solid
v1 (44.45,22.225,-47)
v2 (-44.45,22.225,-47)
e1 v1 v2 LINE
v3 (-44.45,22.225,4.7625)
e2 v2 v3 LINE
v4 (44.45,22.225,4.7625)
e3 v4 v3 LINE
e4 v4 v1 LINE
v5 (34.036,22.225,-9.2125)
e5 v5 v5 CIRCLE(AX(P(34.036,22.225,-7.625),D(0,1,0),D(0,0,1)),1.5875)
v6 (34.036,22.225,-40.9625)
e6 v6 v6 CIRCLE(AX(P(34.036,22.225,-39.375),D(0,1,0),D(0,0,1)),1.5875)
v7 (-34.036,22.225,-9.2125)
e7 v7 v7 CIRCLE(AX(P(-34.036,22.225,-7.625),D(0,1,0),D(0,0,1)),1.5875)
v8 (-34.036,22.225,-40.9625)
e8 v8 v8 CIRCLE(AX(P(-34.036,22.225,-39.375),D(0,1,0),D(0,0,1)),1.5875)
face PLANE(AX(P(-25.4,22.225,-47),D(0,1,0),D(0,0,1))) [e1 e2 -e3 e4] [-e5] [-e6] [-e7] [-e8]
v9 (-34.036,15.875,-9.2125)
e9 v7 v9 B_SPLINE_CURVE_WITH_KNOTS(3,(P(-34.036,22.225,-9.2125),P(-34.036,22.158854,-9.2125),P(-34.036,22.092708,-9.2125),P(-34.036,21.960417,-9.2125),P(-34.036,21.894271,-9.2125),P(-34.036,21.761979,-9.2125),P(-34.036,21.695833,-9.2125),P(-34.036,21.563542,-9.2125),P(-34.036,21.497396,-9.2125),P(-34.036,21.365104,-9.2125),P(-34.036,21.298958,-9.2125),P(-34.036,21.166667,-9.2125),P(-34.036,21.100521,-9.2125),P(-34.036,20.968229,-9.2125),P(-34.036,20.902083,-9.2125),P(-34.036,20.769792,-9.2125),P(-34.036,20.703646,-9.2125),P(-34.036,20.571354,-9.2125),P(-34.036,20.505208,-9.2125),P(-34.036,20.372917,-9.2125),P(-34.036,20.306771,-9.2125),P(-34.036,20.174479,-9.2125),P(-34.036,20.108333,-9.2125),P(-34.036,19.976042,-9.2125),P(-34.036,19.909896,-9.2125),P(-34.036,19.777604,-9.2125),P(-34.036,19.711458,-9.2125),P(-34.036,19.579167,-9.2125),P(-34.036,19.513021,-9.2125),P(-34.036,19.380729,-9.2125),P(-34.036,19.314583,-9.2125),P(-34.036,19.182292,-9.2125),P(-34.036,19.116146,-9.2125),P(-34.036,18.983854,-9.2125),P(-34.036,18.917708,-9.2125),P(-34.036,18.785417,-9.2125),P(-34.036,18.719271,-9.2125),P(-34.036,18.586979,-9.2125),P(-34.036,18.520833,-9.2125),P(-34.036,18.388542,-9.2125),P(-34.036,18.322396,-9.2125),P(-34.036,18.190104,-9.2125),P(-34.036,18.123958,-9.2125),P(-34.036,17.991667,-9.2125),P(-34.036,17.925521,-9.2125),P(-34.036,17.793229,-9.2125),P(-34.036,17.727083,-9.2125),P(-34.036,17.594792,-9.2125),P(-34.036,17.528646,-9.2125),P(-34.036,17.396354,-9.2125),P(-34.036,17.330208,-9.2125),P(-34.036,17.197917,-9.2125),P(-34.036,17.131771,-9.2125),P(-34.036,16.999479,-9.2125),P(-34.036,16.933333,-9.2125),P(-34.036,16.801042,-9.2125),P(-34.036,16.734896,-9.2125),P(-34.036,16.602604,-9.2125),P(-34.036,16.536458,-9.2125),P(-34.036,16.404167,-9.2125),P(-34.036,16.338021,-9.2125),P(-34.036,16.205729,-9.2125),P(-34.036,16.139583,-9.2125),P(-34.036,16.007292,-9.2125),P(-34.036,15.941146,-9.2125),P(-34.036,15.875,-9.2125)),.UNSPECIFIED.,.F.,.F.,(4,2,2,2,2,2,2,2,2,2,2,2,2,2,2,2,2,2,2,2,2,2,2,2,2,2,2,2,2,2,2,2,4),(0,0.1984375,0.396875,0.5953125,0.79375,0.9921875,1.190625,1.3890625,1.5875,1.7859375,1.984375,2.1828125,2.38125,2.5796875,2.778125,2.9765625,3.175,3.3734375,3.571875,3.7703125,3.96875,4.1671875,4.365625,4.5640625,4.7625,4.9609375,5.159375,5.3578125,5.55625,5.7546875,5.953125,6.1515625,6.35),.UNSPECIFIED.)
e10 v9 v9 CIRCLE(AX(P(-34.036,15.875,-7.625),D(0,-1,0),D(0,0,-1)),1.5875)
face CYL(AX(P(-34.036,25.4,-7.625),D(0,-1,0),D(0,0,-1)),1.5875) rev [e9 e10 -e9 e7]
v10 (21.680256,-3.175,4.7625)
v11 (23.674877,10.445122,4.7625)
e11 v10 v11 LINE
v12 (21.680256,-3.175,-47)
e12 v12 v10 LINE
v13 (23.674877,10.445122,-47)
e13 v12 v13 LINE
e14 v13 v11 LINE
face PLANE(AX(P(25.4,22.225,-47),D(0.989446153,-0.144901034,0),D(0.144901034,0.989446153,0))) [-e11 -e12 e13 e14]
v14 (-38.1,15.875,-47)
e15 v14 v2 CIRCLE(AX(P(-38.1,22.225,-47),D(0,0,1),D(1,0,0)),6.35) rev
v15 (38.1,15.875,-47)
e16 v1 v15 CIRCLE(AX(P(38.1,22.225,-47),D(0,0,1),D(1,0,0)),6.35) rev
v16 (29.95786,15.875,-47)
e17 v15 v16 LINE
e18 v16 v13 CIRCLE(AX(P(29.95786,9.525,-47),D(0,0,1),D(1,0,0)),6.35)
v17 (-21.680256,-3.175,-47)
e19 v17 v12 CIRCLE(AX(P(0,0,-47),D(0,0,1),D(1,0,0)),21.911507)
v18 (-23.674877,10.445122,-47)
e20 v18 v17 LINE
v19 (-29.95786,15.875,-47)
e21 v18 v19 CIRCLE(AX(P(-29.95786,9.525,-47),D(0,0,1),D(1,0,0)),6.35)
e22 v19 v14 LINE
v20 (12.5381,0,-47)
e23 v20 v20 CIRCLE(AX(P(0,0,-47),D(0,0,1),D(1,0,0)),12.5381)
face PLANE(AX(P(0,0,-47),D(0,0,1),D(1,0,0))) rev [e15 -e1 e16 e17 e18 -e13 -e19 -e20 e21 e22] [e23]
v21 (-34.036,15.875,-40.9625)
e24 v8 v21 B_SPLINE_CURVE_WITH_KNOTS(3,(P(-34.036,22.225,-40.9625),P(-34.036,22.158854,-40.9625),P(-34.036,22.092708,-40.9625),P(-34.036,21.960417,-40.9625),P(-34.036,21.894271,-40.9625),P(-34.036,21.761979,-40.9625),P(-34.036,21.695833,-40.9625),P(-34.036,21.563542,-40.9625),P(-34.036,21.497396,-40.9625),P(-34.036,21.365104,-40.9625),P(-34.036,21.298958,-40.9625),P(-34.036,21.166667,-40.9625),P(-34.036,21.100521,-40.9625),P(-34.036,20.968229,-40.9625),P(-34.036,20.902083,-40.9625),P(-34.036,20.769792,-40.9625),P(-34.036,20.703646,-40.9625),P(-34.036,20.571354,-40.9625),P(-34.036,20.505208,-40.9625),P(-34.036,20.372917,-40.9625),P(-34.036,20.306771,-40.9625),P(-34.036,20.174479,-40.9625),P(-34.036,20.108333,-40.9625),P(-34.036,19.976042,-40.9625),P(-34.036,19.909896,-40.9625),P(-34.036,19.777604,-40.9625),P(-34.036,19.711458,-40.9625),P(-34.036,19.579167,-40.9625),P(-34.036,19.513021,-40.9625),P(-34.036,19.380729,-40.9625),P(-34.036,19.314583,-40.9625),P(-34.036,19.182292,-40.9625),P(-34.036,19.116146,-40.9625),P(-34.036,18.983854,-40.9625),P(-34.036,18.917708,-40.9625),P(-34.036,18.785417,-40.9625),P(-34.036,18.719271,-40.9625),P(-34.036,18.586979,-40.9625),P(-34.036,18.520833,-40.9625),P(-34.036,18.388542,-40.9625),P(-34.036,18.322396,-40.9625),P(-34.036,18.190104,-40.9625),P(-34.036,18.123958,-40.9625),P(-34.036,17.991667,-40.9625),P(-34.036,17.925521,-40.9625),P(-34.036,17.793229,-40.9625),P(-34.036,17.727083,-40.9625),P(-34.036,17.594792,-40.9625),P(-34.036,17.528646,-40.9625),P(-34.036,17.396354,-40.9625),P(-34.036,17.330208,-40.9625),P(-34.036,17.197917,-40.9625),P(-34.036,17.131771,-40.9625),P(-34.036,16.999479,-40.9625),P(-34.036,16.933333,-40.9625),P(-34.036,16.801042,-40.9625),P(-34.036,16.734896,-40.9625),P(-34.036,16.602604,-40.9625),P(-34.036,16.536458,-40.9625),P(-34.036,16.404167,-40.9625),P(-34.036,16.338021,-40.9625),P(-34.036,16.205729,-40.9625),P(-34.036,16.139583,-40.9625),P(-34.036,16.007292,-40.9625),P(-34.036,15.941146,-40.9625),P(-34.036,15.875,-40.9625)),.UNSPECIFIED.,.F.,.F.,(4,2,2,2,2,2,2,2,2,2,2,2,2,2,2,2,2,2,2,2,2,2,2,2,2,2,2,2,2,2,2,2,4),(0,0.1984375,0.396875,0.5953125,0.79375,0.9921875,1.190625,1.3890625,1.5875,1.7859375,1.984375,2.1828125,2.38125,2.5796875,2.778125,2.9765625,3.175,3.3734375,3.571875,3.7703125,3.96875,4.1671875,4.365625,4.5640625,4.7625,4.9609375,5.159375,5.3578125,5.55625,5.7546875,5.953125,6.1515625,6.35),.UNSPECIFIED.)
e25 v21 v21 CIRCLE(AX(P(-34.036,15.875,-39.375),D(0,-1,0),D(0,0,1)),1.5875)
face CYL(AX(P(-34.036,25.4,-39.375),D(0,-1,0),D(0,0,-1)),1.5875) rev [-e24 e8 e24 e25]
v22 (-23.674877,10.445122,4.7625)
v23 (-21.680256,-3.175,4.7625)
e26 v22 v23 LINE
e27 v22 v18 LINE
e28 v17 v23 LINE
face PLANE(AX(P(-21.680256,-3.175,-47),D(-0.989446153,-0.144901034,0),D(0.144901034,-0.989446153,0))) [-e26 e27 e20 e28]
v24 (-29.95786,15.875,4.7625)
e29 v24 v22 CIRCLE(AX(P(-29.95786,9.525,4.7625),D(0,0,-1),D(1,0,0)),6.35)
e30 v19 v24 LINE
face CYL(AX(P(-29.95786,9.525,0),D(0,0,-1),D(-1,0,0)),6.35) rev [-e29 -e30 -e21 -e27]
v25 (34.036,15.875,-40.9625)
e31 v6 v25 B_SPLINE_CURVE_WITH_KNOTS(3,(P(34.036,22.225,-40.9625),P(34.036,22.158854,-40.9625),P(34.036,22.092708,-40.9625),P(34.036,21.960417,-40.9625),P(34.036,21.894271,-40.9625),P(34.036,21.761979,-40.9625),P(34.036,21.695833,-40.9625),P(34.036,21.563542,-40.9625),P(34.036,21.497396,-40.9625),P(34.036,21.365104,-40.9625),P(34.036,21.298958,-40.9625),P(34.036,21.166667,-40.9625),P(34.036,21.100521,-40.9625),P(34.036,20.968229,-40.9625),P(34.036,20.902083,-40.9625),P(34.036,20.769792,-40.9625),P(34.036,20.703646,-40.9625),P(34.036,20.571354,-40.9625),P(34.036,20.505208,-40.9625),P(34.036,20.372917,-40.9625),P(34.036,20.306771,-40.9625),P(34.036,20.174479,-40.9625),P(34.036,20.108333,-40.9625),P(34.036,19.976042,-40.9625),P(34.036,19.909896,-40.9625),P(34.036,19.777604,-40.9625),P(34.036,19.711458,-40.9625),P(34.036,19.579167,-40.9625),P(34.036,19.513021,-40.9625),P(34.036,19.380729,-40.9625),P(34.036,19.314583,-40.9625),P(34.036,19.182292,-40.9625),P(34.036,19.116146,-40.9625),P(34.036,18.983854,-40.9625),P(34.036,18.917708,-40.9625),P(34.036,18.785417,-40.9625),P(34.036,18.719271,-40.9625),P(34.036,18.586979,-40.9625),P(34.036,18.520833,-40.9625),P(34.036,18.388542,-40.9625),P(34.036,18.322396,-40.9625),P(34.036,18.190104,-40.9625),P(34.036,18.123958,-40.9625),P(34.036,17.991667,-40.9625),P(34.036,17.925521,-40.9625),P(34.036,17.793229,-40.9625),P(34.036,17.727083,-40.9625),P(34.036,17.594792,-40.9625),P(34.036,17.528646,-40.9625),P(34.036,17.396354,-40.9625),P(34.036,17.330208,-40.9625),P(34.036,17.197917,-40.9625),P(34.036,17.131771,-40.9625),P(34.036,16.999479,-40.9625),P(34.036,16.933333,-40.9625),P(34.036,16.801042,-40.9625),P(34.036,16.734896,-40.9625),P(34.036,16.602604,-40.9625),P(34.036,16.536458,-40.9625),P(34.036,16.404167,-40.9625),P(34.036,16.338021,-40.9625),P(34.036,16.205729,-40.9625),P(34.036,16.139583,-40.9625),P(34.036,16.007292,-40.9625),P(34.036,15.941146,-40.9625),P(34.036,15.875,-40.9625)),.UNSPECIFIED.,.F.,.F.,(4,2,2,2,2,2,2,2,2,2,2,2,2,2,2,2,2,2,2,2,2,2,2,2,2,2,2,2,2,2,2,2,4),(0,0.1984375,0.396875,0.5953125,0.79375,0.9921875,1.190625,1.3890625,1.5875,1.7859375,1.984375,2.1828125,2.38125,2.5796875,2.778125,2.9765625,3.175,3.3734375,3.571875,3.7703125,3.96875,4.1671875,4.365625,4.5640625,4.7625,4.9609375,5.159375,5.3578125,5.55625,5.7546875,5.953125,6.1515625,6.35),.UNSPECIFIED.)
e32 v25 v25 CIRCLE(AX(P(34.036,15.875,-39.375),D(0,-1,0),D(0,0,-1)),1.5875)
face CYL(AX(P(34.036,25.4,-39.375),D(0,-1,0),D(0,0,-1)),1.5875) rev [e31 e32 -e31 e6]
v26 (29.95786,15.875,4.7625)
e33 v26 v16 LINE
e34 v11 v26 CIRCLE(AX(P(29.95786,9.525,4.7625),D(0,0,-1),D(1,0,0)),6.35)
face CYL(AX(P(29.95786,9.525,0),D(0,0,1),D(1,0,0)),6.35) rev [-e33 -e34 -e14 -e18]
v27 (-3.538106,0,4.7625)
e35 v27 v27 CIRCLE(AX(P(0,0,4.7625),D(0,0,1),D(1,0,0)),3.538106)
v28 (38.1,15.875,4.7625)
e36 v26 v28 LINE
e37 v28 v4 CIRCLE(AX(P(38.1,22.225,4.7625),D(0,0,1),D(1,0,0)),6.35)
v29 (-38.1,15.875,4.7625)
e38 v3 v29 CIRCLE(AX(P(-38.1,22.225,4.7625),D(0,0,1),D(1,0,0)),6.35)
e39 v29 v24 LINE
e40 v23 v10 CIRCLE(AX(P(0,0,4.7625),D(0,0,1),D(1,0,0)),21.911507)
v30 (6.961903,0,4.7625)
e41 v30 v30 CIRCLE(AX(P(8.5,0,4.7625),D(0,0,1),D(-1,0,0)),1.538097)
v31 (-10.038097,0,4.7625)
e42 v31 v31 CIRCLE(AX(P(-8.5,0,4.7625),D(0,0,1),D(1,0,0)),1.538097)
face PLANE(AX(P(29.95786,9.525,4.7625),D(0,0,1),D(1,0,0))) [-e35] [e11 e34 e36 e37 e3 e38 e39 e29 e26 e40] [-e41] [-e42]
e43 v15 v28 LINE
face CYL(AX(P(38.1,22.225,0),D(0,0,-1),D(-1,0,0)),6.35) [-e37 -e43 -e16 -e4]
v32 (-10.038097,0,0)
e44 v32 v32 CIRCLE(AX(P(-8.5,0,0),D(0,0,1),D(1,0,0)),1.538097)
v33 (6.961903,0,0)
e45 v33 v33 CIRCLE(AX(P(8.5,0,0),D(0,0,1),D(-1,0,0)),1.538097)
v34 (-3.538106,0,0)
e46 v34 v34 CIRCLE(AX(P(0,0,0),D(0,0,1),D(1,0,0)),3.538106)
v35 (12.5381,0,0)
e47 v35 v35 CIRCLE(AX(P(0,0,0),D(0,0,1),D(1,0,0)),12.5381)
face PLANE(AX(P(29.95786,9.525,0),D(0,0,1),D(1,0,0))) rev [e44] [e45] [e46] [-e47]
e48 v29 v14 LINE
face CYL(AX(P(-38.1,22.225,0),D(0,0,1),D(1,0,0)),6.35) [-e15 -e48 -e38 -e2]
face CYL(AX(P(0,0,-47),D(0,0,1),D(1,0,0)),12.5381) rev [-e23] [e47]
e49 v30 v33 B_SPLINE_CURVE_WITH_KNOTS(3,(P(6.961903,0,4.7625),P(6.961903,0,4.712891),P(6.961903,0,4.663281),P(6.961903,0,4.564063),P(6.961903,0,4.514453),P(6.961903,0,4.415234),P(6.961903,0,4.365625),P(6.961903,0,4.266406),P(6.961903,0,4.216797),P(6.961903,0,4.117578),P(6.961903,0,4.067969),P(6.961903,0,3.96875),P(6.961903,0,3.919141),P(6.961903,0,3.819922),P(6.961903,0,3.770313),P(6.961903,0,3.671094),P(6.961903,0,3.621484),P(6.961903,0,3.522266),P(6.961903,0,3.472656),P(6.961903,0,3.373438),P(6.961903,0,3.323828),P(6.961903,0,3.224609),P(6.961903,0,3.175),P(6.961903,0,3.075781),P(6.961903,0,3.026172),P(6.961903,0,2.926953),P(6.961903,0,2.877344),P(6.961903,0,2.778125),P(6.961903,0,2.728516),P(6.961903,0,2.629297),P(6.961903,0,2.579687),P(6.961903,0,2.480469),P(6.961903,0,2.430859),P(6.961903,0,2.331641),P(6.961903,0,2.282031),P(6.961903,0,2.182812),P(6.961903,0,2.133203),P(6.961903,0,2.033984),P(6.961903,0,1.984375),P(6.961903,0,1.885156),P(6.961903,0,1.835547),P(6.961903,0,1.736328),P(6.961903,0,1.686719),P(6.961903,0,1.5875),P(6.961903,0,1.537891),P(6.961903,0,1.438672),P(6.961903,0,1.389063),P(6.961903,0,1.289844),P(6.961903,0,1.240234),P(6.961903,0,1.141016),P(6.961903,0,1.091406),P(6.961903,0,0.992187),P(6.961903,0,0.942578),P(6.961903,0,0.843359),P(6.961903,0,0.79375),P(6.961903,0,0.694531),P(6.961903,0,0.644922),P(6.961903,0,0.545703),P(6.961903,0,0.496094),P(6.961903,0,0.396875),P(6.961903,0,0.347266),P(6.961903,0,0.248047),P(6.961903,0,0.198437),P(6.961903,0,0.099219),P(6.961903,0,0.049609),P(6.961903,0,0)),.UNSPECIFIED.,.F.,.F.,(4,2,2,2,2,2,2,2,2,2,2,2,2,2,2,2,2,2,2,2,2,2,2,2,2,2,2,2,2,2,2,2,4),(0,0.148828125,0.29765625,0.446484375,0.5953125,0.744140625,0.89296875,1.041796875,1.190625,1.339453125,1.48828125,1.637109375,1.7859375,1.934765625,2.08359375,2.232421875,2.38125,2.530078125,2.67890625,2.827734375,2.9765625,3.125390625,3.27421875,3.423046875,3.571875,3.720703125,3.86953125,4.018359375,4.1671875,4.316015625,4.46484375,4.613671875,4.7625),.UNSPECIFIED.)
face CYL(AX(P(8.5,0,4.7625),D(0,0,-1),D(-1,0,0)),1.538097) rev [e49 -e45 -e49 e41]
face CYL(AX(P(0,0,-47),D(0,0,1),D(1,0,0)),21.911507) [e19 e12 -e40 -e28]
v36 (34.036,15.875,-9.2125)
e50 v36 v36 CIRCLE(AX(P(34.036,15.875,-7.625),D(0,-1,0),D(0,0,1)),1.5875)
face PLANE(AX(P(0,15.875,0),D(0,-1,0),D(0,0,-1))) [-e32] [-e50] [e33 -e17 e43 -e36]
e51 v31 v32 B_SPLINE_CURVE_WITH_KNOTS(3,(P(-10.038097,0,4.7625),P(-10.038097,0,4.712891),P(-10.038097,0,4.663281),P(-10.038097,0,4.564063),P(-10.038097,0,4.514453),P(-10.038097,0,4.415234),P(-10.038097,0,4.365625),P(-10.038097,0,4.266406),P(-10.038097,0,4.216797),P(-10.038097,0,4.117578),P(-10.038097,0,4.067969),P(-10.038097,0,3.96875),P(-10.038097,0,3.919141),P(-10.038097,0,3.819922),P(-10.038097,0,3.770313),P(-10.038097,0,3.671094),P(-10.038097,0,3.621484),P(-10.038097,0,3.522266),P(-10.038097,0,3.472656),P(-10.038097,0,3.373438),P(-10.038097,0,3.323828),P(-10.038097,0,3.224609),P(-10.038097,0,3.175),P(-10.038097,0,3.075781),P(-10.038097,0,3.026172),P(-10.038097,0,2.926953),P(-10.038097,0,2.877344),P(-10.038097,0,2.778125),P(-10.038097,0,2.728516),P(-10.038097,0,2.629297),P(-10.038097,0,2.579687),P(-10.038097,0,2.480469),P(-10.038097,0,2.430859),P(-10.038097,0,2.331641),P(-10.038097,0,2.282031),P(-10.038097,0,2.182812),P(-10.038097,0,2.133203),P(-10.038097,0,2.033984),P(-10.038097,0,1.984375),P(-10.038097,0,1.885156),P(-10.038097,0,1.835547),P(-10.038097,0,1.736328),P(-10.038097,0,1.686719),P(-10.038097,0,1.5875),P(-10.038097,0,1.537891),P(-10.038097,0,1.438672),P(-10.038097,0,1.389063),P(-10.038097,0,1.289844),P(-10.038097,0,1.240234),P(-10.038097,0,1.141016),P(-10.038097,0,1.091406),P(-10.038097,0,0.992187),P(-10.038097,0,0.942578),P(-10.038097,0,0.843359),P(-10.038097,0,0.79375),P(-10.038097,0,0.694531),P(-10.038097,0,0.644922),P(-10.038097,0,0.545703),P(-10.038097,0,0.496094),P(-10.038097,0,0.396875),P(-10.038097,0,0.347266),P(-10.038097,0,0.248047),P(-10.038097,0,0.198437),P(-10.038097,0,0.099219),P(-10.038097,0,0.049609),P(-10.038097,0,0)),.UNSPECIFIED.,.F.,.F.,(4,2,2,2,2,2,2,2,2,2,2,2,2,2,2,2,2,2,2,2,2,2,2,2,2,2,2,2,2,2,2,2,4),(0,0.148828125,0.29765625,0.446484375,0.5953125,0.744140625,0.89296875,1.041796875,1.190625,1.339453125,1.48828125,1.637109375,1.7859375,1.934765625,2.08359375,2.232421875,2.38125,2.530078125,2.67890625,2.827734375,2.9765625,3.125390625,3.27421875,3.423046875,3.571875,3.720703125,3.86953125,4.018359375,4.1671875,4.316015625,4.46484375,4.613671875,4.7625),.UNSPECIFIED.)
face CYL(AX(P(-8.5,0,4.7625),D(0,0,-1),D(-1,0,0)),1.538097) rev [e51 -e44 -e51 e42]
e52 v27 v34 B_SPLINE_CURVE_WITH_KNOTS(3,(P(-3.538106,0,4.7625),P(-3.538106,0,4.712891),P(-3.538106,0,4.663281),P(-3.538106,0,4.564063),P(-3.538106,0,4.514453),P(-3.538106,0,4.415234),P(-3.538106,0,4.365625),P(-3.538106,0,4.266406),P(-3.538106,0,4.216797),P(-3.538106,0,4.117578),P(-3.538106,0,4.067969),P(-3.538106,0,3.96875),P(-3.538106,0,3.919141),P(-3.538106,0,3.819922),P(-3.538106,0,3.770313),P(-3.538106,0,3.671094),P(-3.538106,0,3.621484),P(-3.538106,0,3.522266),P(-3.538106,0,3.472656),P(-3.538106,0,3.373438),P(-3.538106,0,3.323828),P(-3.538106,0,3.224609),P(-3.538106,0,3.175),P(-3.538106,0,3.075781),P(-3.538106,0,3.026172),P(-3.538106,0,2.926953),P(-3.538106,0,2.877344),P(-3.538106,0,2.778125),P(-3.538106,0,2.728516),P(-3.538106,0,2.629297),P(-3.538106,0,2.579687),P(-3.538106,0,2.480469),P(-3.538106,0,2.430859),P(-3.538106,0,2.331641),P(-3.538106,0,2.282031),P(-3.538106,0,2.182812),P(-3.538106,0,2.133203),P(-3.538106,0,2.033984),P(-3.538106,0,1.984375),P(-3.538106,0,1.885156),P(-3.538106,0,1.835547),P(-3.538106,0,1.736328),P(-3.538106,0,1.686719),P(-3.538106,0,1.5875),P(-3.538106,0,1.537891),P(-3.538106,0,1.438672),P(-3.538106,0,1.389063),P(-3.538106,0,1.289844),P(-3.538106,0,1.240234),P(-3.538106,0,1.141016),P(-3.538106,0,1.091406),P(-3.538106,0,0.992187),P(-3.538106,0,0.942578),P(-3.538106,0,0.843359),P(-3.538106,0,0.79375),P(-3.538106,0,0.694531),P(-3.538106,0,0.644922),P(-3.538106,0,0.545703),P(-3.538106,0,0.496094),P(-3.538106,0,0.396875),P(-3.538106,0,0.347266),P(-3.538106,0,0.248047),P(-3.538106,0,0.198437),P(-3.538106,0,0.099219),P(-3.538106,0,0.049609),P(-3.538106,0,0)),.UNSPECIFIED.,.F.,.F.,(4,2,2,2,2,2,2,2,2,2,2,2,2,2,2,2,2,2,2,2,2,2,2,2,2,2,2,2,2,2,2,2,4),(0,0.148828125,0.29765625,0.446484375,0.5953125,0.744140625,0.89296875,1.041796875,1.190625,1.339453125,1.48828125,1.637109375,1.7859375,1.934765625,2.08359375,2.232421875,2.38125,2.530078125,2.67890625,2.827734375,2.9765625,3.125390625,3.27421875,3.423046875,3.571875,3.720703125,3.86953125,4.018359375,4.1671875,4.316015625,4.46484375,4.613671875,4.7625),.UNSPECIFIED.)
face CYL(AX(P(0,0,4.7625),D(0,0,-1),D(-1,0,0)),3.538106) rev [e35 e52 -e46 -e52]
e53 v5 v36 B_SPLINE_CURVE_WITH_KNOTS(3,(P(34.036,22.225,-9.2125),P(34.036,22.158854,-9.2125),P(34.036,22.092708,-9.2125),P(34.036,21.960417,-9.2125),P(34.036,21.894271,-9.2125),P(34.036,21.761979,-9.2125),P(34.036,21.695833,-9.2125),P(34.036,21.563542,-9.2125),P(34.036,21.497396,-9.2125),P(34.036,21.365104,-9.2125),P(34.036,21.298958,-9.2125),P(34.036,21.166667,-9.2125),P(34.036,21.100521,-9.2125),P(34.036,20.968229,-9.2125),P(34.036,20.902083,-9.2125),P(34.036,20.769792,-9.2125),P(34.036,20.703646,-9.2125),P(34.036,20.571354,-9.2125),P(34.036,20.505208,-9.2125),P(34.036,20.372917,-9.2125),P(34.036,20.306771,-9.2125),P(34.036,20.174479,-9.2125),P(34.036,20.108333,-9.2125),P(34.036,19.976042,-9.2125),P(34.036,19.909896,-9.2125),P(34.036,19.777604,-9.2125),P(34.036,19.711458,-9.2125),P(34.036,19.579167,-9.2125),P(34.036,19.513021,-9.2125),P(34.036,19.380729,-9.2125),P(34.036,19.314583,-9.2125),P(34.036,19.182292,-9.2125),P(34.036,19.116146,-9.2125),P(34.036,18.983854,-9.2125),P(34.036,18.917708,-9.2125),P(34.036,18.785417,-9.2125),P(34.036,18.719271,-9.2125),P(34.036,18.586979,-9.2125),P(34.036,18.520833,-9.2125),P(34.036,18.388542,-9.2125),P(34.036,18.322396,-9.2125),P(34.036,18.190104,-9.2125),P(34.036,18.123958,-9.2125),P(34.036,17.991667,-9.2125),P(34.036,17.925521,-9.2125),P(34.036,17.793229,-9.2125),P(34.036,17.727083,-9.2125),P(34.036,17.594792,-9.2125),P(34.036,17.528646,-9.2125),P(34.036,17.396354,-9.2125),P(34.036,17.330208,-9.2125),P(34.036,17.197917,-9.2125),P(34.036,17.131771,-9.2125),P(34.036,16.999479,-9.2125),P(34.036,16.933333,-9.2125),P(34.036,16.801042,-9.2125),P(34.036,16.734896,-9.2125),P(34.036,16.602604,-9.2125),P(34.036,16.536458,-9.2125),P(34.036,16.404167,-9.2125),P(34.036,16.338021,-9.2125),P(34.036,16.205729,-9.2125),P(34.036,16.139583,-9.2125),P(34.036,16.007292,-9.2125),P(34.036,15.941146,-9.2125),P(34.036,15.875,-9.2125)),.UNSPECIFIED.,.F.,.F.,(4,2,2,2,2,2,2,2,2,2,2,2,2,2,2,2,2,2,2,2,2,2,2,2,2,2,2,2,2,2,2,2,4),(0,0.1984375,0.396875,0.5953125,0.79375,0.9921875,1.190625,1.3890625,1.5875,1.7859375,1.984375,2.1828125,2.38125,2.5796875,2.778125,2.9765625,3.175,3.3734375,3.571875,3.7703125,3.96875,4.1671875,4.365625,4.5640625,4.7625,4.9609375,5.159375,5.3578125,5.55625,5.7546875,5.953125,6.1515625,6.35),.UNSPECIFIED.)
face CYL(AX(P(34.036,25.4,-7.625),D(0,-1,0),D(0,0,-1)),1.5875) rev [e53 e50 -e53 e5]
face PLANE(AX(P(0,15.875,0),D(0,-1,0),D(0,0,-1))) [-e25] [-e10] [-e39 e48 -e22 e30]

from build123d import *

# Parameters (mm, degrees)
SKETCH1_R           = 12.5381004
BOSS_EXTRUDE1_DEPTH = 47
SKETCH2_W           = 88.9
SKETCH2_H           = 47
BOSS_EXTRUDE2_DEPTH = 6.35
FILLET1_R           = 6.35
SKETCH3_R           = 1.5875
CUT_EXTRUDE1_DEPTH  = 9.525
BOSS_EXTRUDE3_START = 4.7625
SKETCH5_R           = 3.5381057
SKETCH5_R_2         = 1.538097
BOSS_EXTRUDE3_DEPTH = 4.7625


with BuildPart() as part:
    # Sketch1 → Boss-Extrude1 (new body)
    with BuildSketch(Plane.XY):
        with BuildLine():
            Line((-25.4, 22.225), (25.4, 22.225))
            Line((25.4, 22.225), (21.680256121, -3.175))
            ThreePointArc((21.680256121, -3.175), (0, -21.911506805), (-21.680256121, -3.175))
            Line((-21.680256121, -3.175), (-25.4, 22.225))
        make_face()
        Circle(SKETCH1_R, mode=Mode.SUBTRACT)
    extrude(amount=-BOSS_EXTRUDE1_DEPTH)

    # Sketch2 → Boss-Extrude2 (add)
    with BuildSketch(Plane(origin=(0, 22.225, 0), x_dir=(1, 0, 0), z_dir=(0, 1, 0))):
        with Locations((0, 23.5)):
            Rectangle(SKETCH2_W, SKETCH2_H)
    extrude(amount=-BOSS_EXTRUDE2_DEPTH)

    # Fillet1
    fillet1_edges = [part.edges().sort_by_distance(p)[0] for p in [
        (44.45, 15.875, -23.5),
        (-44.45, 15.875, -23.5),
        (24.47006403, 15.875, -23.5),
        (-24.47006403, 15.875, -23.5),
    ]]
    fillet(fillet1_edges, radius=FILLET1_R - 0.0001)  # a hair under: the kernel refuses the full size

    # Sketch3 → Cut-Extrude1 (cut)
    with BuildSketch(Plane.XZ.offset(-15.875)):
        with Locations(Location((-34.036, -7.625, 0), (0, 0, 270))):
            Circle(SKETCH3_R)
        with Locations(Location((-34.036, -39.375, 0), (0, 0, 270))):
            Circle(SKETCH3_R)
        with Locations(Location((34.036, -39.375, 0), (0, 0, 270))):
            Circle(SKETCH3_R)
        with Locations(Location((34.036, -7.625, 0), (0, 0, 270))):
            Circle(SKETCH3_R)
    extrude(amount=-CUT_EXTRUDE1_DEPTH, mode=Mode.SUBTRACT)

    # Sketch5 → Boss-Extrude3 (add)
    with BuildSketch(Plane.XY.offset(BOSS_EXTRUDE3_START)):
        with BuildLine():
            Line((29.957859818, 15.875), (38.1, 15.875))
            ThreePointArc((38.1, 15.875), (42.590128061, 17.734871939), (44.45, 22.225))
            Line((44.45, 22.225), (-44.45, 22.225))
            ThreePointArc((-44.45, 22.225), (-42.590128061, 17.734871939), (-38.1, 15.875))
            Line((-38.1, 15.875), (-29.957859818, 15.875))
            ThreePointArc((-29.957859818, 15.875), (-25.805768294, 14.329439195), (-23.674876744, 10.445121568))
            Line((-23.674876744, 10.445121568), (-21.680256121, -3.175))
            ThreePointArc((-21.680256121, -3.175), (0, -21.911506805), (21.680256121, -3.175))
            Line((21.680256121, -3.175), (23.674876744, 10.445121568))
            ThreePointArc((23.674876744, 10.445121568), (25.805768294, 14.329439195), (29.957859818, 15.875))
        make_face()
        with Locations(Location((0, 0, 0), (0, 0, 180))):
            Circle(SKETCH5_R, mode=Mode.SUBTRACT)
        with Locations(Location((-8.5, 0, 0), (0, 0, 180))):
            Circle(SKETCH5_R_2, mode=Mode.SUBTRACT)
        with Locations(Location((8.5, 0, 0), (0, 0, 180))):
            Circle(SKETCH5_R_2, mode=Mode.SUBTRACT)
    extrude(amount=-BOSS_EXTRUDE3_DEPTH)


solid = part.part
